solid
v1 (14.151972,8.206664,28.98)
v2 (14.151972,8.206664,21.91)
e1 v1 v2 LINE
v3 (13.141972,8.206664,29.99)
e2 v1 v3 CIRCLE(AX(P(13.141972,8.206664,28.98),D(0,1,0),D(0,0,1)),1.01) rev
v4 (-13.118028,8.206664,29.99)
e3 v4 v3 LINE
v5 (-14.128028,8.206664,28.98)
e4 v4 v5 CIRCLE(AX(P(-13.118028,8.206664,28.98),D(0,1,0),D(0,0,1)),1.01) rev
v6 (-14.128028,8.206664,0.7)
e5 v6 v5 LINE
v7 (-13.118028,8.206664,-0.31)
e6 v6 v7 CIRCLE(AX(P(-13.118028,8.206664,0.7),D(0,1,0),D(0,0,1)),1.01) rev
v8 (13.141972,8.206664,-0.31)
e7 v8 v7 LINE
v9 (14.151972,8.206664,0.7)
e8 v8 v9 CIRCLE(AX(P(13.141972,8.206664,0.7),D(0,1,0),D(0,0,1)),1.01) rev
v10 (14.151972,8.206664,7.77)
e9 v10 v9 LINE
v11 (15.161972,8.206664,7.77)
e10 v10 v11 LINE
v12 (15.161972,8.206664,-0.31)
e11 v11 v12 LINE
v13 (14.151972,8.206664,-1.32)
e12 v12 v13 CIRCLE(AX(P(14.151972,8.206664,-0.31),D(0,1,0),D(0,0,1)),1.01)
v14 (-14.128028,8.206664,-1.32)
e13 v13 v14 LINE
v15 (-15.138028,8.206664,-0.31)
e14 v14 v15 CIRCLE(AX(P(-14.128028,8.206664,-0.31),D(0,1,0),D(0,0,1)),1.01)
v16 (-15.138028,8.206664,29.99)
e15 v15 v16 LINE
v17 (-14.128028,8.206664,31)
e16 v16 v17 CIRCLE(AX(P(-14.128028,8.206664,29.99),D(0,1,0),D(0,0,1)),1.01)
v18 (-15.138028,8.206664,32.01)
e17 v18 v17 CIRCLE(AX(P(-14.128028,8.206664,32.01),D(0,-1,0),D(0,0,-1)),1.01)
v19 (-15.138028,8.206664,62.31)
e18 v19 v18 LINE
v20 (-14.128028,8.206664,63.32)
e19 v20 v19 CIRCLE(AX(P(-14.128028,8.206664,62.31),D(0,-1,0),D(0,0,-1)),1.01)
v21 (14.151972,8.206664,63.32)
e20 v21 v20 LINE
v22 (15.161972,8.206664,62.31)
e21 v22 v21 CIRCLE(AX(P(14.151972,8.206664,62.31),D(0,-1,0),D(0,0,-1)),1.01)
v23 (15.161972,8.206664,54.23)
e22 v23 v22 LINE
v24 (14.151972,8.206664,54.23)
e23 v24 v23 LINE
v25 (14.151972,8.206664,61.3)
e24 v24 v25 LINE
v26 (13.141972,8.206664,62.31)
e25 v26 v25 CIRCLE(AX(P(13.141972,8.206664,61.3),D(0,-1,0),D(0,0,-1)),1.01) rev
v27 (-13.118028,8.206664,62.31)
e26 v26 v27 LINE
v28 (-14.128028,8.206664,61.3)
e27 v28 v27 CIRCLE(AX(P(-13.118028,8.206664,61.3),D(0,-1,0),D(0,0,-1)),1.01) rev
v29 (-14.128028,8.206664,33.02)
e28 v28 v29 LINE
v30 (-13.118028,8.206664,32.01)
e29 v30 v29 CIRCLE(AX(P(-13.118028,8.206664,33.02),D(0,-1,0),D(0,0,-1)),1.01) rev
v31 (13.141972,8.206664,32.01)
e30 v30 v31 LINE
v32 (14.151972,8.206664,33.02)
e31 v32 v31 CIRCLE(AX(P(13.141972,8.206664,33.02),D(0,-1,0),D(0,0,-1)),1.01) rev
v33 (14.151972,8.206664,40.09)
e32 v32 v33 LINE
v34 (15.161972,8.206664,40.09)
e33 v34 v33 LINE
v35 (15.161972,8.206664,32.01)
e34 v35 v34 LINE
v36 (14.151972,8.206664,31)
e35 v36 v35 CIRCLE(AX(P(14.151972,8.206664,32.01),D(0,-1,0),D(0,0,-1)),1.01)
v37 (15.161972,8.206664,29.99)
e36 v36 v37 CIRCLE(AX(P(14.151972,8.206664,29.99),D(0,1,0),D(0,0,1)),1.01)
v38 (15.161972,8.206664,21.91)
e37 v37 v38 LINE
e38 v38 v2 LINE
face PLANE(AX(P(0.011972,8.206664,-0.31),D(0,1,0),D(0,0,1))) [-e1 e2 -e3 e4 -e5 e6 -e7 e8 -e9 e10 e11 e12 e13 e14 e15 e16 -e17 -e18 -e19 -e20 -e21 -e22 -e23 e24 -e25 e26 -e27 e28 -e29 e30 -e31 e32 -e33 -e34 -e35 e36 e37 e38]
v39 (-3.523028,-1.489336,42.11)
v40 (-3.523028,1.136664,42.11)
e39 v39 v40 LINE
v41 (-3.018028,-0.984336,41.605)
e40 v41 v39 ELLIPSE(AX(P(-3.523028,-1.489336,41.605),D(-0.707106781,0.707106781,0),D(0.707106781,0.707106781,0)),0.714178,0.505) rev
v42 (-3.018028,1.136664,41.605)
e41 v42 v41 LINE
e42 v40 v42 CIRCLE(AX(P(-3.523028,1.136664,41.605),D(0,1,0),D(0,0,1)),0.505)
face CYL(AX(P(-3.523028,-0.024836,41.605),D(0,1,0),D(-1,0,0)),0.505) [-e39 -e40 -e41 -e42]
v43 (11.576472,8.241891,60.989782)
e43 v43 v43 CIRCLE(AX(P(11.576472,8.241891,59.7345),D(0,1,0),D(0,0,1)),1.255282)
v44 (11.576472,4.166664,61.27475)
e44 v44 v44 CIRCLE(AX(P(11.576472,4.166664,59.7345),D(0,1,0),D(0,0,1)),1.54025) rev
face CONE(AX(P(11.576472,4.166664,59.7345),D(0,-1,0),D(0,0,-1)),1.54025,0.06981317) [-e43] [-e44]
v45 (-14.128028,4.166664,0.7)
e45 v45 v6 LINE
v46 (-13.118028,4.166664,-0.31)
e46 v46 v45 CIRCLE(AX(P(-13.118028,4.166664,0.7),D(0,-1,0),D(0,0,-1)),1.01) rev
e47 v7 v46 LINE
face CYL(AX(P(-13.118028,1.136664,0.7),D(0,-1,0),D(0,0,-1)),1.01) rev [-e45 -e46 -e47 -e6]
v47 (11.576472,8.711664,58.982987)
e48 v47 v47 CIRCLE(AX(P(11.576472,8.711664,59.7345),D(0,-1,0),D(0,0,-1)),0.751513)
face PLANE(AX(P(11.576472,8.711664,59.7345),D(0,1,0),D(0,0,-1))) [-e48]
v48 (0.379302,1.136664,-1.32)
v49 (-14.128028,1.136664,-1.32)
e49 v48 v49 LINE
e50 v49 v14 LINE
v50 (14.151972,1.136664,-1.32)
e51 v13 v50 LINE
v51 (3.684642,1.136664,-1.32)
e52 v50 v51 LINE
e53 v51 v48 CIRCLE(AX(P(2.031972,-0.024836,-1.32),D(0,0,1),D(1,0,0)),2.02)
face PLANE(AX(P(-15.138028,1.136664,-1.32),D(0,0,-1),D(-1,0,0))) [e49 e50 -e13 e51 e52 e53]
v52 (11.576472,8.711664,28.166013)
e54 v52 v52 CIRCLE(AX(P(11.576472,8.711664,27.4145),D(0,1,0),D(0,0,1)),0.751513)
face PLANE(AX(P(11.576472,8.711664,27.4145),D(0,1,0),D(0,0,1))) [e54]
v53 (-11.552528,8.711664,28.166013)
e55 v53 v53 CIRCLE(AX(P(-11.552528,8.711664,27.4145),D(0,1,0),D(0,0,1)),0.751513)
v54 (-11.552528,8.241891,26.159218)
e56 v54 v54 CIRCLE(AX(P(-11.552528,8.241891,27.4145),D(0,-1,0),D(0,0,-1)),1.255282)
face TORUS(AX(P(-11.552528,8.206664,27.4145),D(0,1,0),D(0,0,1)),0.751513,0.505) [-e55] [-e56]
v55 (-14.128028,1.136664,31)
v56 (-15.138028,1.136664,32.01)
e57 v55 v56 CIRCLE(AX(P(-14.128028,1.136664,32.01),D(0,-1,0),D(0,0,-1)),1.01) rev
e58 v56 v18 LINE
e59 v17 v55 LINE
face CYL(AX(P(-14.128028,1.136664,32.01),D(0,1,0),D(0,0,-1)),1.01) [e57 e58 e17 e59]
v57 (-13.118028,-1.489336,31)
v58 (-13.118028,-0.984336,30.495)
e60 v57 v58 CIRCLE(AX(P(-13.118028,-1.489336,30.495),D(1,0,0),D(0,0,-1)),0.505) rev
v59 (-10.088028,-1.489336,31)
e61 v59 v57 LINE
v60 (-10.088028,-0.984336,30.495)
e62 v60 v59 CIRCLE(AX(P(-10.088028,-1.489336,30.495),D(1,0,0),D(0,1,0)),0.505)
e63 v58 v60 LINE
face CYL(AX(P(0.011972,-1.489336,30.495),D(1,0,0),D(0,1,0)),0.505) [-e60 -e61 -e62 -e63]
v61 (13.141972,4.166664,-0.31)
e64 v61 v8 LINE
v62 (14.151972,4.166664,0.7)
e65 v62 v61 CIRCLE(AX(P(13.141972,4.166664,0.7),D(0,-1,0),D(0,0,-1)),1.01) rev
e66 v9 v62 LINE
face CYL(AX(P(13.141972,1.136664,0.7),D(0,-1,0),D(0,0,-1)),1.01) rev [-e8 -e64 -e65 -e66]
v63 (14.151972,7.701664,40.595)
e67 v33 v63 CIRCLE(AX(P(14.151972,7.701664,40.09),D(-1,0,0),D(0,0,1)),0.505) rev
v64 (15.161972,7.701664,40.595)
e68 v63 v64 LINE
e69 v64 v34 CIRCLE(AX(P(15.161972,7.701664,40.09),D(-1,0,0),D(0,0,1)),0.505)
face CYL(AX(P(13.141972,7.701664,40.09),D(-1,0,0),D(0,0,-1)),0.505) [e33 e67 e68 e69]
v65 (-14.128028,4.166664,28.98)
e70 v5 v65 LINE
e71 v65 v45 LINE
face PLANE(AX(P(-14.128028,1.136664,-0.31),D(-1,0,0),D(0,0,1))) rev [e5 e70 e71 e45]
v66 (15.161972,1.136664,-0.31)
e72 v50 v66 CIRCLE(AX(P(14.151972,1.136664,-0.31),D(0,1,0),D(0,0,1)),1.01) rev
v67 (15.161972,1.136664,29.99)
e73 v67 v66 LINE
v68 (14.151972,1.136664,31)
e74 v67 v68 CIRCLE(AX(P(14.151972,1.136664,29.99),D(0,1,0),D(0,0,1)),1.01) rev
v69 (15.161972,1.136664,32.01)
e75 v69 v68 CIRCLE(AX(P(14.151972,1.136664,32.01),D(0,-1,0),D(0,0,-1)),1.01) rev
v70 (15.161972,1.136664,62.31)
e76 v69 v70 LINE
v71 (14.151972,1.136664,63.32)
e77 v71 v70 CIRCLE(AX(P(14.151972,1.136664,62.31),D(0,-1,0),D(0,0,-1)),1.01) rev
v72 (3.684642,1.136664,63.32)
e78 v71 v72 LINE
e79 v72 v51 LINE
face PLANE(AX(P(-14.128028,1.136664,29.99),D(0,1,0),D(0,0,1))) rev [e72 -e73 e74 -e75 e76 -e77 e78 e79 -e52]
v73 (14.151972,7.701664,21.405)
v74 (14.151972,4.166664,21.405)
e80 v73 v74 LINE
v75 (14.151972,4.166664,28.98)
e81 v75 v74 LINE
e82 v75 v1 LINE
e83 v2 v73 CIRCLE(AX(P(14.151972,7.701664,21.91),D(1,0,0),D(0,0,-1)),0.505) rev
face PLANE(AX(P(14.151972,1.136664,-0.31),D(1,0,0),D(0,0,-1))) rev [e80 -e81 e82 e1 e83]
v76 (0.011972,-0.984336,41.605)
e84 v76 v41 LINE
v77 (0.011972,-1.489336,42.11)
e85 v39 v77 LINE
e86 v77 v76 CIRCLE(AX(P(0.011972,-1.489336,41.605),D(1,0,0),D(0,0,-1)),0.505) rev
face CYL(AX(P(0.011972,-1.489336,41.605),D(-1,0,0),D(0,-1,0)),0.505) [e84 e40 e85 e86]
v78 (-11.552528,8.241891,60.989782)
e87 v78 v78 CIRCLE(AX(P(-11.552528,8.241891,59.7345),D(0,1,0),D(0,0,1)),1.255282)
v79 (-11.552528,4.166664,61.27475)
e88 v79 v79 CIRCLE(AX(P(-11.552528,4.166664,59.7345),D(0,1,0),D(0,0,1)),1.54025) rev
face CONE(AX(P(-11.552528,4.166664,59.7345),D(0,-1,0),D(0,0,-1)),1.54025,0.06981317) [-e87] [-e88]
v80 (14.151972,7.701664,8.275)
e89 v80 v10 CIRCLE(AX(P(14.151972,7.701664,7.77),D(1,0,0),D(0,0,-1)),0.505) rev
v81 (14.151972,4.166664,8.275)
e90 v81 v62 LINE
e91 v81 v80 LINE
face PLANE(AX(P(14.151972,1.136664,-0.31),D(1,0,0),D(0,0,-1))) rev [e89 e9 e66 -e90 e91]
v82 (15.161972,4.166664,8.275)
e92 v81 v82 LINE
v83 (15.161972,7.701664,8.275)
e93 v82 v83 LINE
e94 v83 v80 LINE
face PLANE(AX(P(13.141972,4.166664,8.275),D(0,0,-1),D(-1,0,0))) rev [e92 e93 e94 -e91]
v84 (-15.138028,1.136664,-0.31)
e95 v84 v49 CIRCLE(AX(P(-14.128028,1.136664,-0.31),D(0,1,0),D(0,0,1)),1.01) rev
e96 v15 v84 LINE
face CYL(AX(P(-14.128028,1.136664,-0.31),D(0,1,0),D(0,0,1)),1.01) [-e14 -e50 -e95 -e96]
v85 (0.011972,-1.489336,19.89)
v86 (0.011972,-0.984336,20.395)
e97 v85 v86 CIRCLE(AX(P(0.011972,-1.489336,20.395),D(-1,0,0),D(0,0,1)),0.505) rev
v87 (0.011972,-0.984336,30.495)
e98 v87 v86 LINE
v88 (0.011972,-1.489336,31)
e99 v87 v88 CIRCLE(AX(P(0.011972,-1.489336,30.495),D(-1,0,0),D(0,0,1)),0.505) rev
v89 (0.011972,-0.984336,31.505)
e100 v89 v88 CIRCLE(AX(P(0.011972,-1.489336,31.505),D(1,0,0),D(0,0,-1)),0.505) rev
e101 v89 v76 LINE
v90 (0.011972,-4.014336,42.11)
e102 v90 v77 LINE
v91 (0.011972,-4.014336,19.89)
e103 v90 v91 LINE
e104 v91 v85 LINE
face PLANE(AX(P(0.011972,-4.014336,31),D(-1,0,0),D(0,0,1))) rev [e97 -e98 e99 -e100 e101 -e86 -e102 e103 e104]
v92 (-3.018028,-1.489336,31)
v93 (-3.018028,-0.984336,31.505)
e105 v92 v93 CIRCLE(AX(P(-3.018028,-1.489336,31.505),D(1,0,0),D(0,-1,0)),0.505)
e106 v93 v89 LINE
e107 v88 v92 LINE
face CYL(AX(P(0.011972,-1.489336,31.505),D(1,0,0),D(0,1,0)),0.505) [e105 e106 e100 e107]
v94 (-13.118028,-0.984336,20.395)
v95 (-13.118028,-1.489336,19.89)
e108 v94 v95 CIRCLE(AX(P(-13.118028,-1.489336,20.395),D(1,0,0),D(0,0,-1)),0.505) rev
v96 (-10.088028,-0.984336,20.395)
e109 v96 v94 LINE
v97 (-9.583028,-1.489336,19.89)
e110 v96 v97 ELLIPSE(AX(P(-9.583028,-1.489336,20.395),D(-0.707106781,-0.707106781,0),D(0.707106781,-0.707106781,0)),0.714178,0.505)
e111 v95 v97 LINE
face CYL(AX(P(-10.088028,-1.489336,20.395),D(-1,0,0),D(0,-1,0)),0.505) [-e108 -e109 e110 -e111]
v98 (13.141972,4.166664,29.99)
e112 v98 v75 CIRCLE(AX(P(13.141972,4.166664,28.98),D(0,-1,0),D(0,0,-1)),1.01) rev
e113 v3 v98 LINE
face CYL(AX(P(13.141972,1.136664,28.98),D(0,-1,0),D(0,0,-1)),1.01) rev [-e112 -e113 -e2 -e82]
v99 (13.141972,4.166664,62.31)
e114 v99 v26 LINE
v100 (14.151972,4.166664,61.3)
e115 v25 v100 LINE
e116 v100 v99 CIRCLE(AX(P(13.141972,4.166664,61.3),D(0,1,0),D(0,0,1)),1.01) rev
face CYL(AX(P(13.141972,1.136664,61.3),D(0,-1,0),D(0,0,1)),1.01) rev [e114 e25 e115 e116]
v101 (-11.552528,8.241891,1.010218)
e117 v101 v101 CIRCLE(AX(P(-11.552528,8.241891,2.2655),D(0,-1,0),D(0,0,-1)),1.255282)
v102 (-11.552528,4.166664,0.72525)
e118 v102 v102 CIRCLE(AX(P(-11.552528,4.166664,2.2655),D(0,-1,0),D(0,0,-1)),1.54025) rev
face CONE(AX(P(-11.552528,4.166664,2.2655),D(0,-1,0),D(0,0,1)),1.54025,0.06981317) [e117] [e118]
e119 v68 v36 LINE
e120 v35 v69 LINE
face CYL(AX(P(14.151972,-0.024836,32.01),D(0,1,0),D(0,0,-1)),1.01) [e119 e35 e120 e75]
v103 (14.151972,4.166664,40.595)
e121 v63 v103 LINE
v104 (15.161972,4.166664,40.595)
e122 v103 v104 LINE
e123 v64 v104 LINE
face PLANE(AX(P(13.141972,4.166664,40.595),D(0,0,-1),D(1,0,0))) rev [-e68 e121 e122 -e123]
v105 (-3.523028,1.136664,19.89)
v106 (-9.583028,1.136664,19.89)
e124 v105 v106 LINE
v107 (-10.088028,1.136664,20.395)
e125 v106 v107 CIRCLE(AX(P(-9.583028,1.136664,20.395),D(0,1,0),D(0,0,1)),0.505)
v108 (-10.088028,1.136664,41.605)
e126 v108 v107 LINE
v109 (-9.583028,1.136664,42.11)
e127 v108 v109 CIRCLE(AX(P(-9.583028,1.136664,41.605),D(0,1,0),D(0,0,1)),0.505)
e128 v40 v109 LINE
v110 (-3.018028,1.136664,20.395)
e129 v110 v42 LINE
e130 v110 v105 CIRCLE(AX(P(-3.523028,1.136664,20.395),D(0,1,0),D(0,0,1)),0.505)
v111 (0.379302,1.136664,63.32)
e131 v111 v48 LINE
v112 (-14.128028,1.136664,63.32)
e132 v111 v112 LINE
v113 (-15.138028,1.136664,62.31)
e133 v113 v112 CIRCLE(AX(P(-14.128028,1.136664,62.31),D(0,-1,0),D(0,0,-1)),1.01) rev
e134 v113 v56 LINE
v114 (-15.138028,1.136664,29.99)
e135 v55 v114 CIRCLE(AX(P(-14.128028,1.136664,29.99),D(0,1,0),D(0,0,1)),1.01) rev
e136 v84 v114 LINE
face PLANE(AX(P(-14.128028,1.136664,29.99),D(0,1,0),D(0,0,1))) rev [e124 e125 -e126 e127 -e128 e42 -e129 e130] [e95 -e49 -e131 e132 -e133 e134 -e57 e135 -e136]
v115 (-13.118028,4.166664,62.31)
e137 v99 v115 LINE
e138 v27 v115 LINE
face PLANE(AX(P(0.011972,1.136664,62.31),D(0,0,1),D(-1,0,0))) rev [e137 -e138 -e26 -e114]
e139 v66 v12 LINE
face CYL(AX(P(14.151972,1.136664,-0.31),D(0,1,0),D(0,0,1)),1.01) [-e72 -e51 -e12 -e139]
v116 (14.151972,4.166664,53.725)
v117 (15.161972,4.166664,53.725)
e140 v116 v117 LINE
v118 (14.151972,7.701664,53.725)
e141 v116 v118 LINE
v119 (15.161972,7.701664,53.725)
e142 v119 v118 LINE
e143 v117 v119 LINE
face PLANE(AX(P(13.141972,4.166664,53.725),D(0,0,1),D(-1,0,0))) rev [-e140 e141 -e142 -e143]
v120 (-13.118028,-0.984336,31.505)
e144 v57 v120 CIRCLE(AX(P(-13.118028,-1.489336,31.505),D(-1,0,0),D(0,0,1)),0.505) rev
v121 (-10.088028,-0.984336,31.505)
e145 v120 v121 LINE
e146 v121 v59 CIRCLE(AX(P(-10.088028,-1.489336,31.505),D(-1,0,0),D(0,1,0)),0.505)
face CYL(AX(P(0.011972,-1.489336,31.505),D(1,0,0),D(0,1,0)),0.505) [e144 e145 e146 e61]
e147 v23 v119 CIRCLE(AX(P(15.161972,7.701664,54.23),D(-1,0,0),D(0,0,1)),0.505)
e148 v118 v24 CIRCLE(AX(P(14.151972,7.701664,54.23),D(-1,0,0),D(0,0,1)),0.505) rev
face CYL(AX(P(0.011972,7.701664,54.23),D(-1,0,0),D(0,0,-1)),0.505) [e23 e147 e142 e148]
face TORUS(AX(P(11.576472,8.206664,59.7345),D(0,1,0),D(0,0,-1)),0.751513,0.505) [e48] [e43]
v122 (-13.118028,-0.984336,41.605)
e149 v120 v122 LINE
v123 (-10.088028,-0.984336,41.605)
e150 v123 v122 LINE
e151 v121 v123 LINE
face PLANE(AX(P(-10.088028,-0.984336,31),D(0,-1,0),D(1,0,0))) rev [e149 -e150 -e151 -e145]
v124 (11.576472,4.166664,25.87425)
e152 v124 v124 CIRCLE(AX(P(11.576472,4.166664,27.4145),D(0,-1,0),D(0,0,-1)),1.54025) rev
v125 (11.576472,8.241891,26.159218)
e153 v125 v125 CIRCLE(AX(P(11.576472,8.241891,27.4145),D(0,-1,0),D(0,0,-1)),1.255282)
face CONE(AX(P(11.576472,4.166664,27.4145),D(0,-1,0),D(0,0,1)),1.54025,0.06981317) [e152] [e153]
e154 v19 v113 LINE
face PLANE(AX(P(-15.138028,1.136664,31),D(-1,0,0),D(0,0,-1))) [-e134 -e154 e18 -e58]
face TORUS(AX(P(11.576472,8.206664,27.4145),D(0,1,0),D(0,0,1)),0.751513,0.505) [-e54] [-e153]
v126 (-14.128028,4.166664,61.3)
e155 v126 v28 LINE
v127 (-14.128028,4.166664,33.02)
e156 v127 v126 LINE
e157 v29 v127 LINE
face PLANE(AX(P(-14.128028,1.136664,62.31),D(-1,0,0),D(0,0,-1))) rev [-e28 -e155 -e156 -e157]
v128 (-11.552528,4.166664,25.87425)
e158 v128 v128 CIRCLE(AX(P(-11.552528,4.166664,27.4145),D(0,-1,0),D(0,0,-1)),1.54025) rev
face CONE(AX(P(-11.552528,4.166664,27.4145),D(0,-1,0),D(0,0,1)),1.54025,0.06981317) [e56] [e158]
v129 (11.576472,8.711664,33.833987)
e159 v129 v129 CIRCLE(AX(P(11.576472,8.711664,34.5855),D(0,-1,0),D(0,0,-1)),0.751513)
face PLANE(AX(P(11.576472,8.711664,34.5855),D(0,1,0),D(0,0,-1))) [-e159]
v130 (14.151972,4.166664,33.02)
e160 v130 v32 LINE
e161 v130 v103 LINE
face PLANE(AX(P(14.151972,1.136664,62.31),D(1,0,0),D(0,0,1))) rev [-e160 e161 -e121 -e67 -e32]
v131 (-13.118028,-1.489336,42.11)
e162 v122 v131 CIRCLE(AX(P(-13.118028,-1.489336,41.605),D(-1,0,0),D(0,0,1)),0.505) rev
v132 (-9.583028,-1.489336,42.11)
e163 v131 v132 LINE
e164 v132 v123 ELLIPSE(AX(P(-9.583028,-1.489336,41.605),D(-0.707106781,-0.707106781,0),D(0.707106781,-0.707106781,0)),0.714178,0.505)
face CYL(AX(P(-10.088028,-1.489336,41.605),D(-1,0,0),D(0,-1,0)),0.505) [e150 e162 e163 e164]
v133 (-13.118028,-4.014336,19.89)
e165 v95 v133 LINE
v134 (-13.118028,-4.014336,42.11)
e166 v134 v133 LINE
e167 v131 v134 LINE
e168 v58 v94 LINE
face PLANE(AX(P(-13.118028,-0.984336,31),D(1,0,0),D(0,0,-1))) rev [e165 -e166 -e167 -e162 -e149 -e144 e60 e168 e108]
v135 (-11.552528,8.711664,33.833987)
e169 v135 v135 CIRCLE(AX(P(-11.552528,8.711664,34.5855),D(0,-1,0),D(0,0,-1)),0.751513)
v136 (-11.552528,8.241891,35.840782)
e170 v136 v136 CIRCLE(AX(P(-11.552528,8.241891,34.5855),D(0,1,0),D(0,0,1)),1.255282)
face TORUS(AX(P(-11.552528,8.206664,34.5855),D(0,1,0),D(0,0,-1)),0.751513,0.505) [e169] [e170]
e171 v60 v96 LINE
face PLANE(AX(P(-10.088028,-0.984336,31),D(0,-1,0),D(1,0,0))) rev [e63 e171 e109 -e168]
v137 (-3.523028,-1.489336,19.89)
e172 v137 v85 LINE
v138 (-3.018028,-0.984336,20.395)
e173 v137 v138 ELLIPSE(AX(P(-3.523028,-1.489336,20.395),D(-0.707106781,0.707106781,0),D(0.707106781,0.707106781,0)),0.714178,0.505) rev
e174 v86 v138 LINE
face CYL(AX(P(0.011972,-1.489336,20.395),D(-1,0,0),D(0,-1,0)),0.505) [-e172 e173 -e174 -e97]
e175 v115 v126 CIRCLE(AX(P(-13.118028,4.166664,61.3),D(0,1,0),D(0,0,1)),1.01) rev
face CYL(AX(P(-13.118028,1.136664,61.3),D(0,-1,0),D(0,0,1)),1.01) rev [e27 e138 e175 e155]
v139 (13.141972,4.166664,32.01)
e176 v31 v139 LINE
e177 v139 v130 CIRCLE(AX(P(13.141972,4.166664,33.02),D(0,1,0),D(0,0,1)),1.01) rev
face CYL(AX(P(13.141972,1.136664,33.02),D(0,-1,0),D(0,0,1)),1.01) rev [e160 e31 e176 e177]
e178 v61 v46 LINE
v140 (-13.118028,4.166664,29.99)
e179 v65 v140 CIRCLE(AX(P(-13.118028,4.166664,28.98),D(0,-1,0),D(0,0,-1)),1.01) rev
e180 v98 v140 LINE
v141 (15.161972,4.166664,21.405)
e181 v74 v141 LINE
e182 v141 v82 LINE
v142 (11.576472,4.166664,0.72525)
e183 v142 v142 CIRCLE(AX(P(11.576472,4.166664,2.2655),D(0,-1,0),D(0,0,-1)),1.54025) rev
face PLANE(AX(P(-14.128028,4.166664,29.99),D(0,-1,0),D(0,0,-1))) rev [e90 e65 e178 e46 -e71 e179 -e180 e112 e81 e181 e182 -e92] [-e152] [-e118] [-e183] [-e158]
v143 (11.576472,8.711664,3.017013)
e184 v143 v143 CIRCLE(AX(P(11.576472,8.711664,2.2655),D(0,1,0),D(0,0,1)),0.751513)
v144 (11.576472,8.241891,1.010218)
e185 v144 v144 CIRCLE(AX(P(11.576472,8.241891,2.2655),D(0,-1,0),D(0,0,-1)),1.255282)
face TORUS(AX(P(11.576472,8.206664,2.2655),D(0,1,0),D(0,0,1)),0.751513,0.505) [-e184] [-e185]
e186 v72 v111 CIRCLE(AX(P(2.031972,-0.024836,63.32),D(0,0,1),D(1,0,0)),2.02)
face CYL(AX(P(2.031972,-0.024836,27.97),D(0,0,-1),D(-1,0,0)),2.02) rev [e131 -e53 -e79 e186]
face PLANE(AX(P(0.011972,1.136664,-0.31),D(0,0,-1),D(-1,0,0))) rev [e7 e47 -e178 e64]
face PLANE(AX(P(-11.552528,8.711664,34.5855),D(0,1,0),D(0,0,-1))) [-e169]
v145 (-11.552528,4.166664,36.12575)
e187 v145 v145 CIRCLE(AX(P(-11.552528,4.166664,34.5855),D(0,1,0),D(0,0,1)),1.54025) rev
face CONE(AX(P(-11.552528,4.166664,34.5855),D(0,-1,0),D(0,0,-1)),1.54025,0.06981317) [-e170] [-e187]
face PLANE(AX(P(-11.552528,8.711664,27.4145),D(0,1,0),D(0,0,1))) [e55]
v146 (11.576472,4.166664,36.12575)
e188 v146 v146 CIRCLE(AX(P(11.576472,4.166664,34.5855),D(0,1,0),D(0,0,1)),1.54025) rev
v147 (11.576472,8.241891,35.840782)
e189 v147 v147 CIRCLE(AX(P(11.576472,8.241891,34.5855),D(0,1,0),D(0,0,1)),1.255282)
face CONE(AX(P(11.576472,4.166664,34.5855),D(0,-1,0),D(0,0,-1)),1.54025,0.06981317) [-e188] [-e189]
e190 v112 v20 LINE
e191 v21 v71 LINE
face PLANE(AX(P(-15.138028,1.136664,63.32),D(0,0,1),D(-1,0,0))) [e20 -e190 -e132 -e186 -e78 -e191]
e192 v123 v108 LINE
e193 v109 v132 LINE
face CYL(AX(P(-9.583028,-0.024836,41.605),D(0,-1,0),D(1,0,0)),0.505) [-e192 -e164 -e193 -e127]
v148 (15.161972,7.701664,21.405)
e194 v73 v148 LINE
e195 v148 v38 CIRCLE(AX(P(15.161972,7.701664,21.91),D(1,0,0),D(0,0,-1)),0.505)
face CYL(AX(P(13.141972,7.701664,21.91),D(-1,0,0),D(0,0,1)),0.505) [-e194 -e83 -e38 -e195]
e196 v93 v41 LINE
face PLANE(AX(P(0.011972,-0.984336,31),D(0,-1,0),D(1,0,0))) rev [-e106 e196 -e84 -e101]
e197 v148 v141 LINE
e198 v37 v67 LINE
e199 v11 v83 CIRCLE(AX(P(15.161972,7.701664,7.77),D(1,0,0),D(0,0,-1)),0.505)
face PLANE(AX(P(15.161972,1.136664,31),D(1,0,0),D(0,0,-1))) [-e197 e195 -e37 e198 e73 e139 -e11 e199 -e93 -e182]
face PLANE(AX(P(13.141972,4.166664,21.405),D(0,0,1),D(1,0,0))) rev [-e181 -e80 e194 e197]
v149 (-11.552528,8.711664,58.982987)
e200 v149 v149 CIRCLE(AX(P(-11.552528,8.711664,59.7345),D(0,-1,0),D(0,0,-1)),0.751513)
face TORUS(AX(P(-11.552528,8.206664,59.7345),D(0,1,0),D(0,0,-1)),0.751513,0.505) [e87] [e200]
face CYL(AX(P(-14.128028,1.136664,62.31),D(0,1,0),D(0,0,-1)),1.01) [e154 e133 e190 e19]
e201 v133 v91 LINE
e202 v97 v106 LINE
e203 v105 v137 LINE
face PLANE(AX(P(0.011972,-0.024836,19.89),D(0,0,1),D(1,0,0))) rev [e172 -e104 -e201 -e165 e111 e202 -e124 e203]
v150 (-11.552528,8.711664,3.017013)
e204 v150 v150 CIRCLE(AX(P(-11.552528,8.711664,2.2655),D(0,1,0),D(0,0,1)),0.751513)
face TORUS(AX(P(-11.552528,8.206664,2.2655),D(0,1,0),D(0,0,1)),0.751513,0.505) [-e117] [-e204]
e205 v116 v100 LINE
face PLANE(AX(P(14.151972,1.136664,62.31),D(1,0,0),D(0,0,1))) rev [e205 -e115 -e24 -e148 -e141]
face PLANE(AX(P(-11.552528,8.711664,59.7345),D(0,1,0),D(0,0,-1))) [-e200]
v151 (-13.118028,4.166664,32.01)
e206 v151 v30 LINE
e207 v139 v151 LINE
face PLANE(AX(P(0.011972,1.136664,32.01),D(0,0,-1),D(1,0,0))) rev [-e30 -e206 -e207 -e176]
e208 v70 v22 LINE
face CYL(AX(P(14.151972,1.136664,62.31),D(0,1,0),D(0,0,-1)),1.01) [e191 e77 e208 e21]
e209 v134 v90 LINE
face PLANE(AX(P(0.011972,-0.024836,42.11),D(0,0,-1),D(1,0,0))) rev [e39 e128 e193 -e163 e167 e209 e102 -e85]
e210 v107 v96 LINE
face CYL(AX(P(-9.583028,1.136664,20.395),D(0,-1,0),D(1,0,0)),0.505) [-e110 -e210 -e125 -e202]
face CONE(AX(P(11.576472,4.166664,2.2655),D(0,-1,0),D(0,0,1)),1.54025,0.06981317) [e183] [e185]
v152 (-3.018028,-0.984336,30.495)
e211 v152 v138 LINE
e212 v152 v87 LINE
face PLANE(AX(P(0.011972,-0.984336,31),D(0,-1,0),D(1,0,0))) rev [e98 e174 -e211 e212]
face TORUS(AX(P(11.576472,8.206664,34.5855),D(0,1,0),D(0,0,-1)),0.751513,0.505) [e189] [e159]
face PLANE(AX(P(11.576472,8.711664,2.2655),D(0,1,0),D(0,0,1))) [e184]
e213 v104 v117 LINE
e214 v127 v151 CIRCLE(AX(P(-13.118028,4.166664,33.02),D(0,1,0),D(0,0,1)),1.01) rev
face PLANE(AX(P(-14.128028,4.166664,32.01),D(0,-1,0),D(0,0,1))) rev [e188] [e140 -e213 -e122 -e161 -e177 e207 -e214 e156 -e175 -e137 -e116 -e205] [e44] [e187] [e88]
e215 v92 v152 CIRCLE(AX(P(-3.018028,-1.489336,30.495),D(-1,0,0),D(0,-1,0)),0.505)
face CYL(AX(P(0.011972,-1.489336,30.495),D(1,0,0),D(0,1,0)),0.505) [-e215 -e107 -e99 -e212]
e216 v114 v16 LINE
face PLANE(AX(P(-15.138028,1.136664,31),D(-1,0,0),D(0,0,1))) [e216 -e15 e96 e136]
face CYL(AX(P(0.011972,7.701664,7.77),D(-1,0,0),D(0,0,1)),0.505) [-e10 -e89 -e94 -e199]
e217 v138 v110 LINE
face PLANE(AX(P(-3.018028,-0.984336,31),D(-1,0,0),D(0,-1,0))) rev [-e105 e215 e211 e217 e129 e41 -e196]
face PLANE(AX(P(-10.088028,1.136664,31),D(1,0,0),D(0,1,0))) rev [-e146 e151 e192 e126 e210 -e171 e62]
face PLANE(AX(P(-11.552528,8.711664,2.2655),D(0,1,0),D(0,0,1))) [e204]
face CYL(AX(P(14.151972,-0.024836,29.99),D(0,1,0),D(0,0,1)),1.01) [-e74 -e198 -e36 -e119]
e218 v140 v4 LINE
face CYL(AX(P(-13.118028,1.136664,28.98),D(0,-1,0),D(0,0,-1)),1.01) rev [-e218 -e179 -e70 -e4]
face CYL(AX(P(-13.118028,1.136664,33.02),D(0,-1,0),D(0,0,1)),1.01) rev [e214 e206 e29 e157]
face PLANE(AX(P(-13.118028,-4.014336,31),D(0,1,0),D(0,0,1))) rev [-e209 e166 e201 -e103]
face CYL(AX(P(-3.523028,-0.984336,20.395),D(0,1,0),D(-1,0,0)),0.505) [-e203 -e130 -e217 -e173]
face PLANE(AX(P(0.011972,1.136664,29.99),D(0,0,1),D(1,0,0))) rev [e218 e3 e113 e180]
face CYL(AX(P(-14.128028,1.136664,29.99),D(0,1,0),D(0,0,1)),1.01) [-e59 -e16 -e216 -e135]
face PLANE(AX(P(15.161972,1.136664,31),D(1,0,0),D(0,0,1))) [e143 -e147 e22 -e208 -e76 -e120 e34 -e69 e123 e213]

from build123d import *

# Parameters (mm, degrees)
BOSS_EXTRUDE1_DEPTH           = 28
SKETCH4_W                     = 28
SKETCH4_H                     = 3
BOSS_EXTRUDE2_DEPTH           = 30
INTERSECT1_DEPTH              = 28
BOSS_EXTRUDE3_DEPTH           = 1
BOSS_EXTRUDE3_DEPTH_BACK      = 10
EXTRUDE_THIN1_DEPTH           = 4
EXTRUDE_THIN1_DEPTH_BACK      = 3
SKETCH8_W                     = 30
SKETCH8_H                     = 32
SKETCH8_W_2                   = 28
SKETCH8_H_2                   = 30
FILLET1_R                     = 1
FILLET2_R                     = 0.5
SKETCH9_R                     = 1.525
BOSS_EXTRUDE4_DEPTH           = 4.5
BOSS_EXTRUDE4_DRAFT           = 4
BOSS_EXTRUDE4_PROFILE_2_DEPTH = 4.5
BOSS_EXTRUDE4_PROFILE_2_DRAFT = 4
BOSS_EXTRUDE4_PROFILE_3_DEPTH = 4.5
BOSS_EXTRUDE4_PROFILE_3_DRAFT = 4
BOSS_EXTRUDE4_PROFILE_4_DEPTH = 4.5
BOSS_EXTRUDE4_PROFILE_4_DRAFT = 4
CUT_EXTRUDE2_DEPTH            = 36.508062465
CUT_EXTRUDE2_DEPTH_BACK       = 36.508062465
SKETCH2_R                     = 2
SKETCH10_W                    = 13
SKETCH10_H                    = 4
CUT_EXTRUDE3_DEPTH            = 2
FILLET3_R                     = 0.5
FILLET4_R                     = 0.5
SCALE1_SCALE                  = 1.01


# Read off the part's stored shape, not the designer's step: Intersect1
with BuildPart() as part:
    # Sketch3 → Boss-Extrude1 (new body)
    with BuildSketch(Plane.XY):
        with BuildLine():
            Line((3.638185472, -1.147322256), (14, -0.95))
            Line((14, -0.95), (14, 1.15))
            Line((14, 1.15), (3.636306817, 1.15))
            ThreePointArc((3.636306817, 1.15), (2, 2), (0.363693183, 1.15))
            Line((0.363693183, 1.15), (-14, 1.15))
            Line((-14, 1.15), (-14, -0.95))
            Line((-14, -0.95), (0.240028409, -0.95))
            ThreePointArc((0.240028409, -0.95), (1.884060434, -1.996636676), (3.638185472, -1.147322256))
        make_face()
    extrude(amount=BOSS_EXTRUDE1_DEPTH)


with BuildPart() as body_2:
    # Sketch4 → Boss-Extrude2 (new body)
    with BuildSketch(Plane.XY):
        with Locations((0, 2.65)):
            Rectangle(SKETCH4_W, SKETCH4_H)
    extrude(amount=BOSS_EXTRUDE2_DEPTH)


with BuildPart() as intersect1_tool:
    # Intersect1 outline → Intersect1 (new body)
    with BuildSketch(Plane.XY):
        with BuildLine():
            Line((14, -0.95), (14, 1.15))
            Line((14, 1.15), (3.636306817, 1.15))
            ThreePointArc((3.636306817, 1.15), (2, 2), (0.363693183, 1.15))
            Line((0.363693183, 1.15), (-14, 1.15))
            Line((-14, 1.15), (-14, -0.95))
            Line((-14, -0.95), (0.240028409, -0.95))
            ThreePointArc((0.240028409, -0.95), (1.884060434, -1.996636676), (3.638185472, -1.147322256))
            Line((3.638185472, -1.147322256), (14, -0.95))
        make_face()
    extrude(amount=INTERSECT1_DEPTH)


with BuildPart() as part_1:
    add(part.part)

    # Intersect1: cut by intersect1_tool
    add(intersect1_tool.part, mode=Mode.SUBTRACT)


with BuildPart() as body_2_1:
    add(body_2.part)

    # Intersect1: cut by intersect1_tool
    add(intersect1_tool.part, mode=Mode.SUBTRACT)

    # Sketch6 → Boss-Extrude3 (add, two sides: drawn at the far end of the back side and taken through both)
    with BuildSketch(Plane.XY.offset(30).offset(-BOSS_EXTRUDE3_DEPTH_BACK)):
        Polygon((-10, 1.15), (-10, -0.95), (-13, -0.95), (-13, -3.95), (0, -3.95), (0, -0.95), (-3, -0.95), (-3, 1.15), align=None)
    extrude(amount=BOSS_EXTRUDE3_DEPTH + BOSS_EXTRUDE3_DEPTH_BACK)

    # Sketch8 → Extrude-Thin1 (add, two sides: drawn at the far end of the back side and taken through both)
    with BuildSketch(Plane(origin=(0, 4.15, 0), x_dir=(1, 0, 0), z_dir=(0, 1, 0)).offset(-EXTRUDE_THIN1_DEPTH_BACK)):
        with Locations((0, -15)):
            Rectangle(SKETCH8_W, SKETCH8_H)
        with Locations((0, -15)):
            Rectangle(SKETCH8_W_2, SKETCH8_H_2, mode=Mode.SUBTRACT)
    extrude(amount=EXTRUDE_THIN1_DEPTH + EXTRUDE_THIN1_DEPTH_BACK)

    # Fillet1
    fillet1_edges = [body_2_1.edges().sort_by_distance(p)[0] for p in [
        (14, 6.15, 0),
        (14, 6.15, 30),
        (-14, 6.15, 0),
        (-14, 6.15, 30),
        (15, 4.65, -1),
        (15, 4.65, 31),
        (-15, 4.65, 31),
        (-15, 4.65, -1),
    ]]
    fillet(fillet1_edges, radius=FILLET1_R)

    # Fillet2
    fillet2_edges = [body_2_1.edges().sort_by_distance(p)[0] for p in [
        (-11.5, -0.95, 20),
        (-1.5, -0.95, 20),
        (-11.5, -0.95, 31),
        (-1.5, -0.95, 31),
    ]]
    fillet(fillet2_edges, radius=FILLET2_R)


with BuildPart() as boss_extrude4_tool:
    # Sketch9 → Boss-Extrude4 (with draft: the straight prism first)
    with BuildSketch(Plane(origin=(0, 4.15, 0), x_dir=(1, 0, 0), z_dir=(0, 1, 0))):
        with Locations((11.45, -27.45)):
            Circle(SKETCH9_R)
    extrude(amount=BOSS_EXTRUDE4_DEPTH)
    # Boss-Extrude4: the draft: its side faces are tilted about the plane it starts from
    boss_extrude4_sides = [boss_extrude4_tool.faces().sort_by_distance(p)[0] for p in [
        (9.925, 6.4, 27.45),
    ]]
    draft(boss_extrude4_sides, Plane(origin=(0, 4.15, 0), x_dir=(1, 0, 0), z_dir=(0, 1, 0)), BOSS_EXTRUDE4_DRAFT)


with BuildPart() as body_2_2:
    add(body_2_1.part)

    # Boss-Extrude4: add boss_extrude4_tool
    add(boss_extrude4_tool.part)


with BuildPart() as boss_extrude4_profile_2_tool:
    # Sketch9 → Boss-Extrude4 profile 2 (with draft: the straight prism first)
    with BuildSketch(Plane(origin=(0, 4.15, 0), x_dir=(1, 0, 0), z_dir=(0, 1, 0))):
        with Locations((-11.45, -27.45)):
            Circle(SKETCH9_R)
    extrude(amount=BOSS_EXTRUDE4_PROFILE_2_DEPTH)
    # Boss-Extrude4 profile 2: the draft: its side faces are tilted about the plane it starts from
    boss_extrude4_profile_2_sides = [boss_extrude4_profile_2_tool.faces().sort_by_distance(p)[0] for p in [
        (-12.975, 6.4, 27.45),
    ]]
    draft(boss_extrude4_profile_2_sides, Plane(origin=(0, 4.15, 0), x_dir=(1, 0, 0), z_dir=(0, 1, 0)), BOSS_EXTRUDE4_PROFILE_2_DRAFT)


with BuildPart() as body_2_3:
    add(body_2_2.part)

    # Boss-Extrude4 profile 2: add boss_extrude4_profile_2_tool
    add(boss_extrude4_profile_2_tool.part)


with BuildPart() as boss_extrude4_profile_3_tool:
    # Sketch9 → Boss-Extrude4 profile 3 (with draft: the straight prism first)
    with BuildSketch(Plane(origin=(0, 4.15, 0), x_dir=(1, 0, 0), z_dir=(0, 1, 0))):
        with Locations((-11.45, -2.55)):
            Circle(SKETCH9_R)
    extrude(amount=BOSS_EXTRUDE4_PROFILE_3_DEPTH)
    # Boss-Extrude4 profile 3: the draft: its side faces are tilted about the plane it starts from
    boss_extrude4_profile_3_sides = [boss_extrude4_profile_3_tool.faces().sort_by_distance(p)[0] for p in [
        (-12.975, 6.4, 2.55),
    ]]
    draft(boss_extrude4_profile_3_sides, Plane(origin=(0, 4.15, 0), x_dir=(1, 0, 0), z_dir=(0, 1, 0)), BOSS_EXTRUDE4_PROFILE_3_DRAFT)


with BuildPart() as body_2_4:
    add(body_2_3.part)

    # Boss-Extrude4 profile 3: add boss_extrude4_profile_3_tool
    add(boss_extrude4_profile_3_tool.part)


with BuildPart() as boss_extrude4_profile_4_tool:
    # Sketch9 → Boss-Extrude4 profile 4 (with draft: the straight prism first)
    with BuildSketch(Plane(origin=(0, 4.15, 0), x_dir=(1, 0, 0), z_dir=(0, 1, 0))):
        with Locations((11.45, -2.55)):
            Circle(SKETCH9_R)
    extrude(amount=BOSS_EXTRUDE4_PROFILE_4_DEPTH)
    # Boss-Extrude4 profile 4: the draft: its side faces are tilted about the plane it starts from
    boss_extrude4_profile_4_sides = [boss_extrude4_profile_4_tool.faces().sort_by_distance(p)[0] for p in [
        (9.925, 6.4, 2.55),
    ]]
    draft(boss_extrude4_profile_4_sides, Plane(origin=(0, 4.15, 0), x_dir=(1, 0, 0), z_dir=(0, 1, 0)), BOSS_EXTRUDE4_PROFILE_4_DRAFT)


with BuildPart() as body_2_5:
    add(body_2_4.part)

    # Boss-Extrude4 profile 4: add boss_extrude4_profile_4_tool
    add(boss_extrude4_profile_4_tool.part)

    # Sketch2 → Cut-Extrude2 (cut, two sides: drawn at the far end of the back side and taken through both)
    with BuildSketch(Plane.XY.offset(-CUT_EXTRUDE2_DEPTH_BACK)):
        with Locations((2, 0)):
            Circle(SKETCH2_R)
    extrude(amount=CUT_EXTRUDE2_DEPTH + CUT_EXTRUDE2_DEPTH_BACK, mode=Mode.SUBTRACT)

    # Sketch10 → Cut-Extrude3 (cut)
    with BuildSketch(Plane(origin=(15, 0, 0), x_dir=(0, 0, -1), z_dir=(1, 0, 0))):
        with Locations((-15, 6.15)):
            Rectangle(SKETCH10_W, SKETCH10_H)
    extrude(amount=-CUT_EXTRUDE3_DEPTH, mode=Mode.SUBTRACT)

    # Fillet3
    fillet3_edges = [body_2_5.edges().sort_by_distance(p)[0] for p in [
        (10.239670654, 8.65, 27.45),
        (-12.660329346, 8.65, 27.45),
        (-12.660329346, 8.65, 2.55),
        (10.239670654, 8.65, 2.55),
        (14.5, 8.15, 21.5),
        (14.5, 8.15, 8.5),
    ]]
    fillet(fillet3_edges, radius=FILLET3_R)

    # Mirror5: body 2 across plane


with BuildPart() as body_2_6:
    add(body_2_5.part)
    add(body_2_5.part.mirror(Plane.XY.offset(31)))

    # Fillet4
    fillet4_edges = [body_2_6.edges().sort_by_distance(p)[0] for p in [
        (-10, -0.15, 20),
        (-3, -0.15, 20),
        (-3, -0.15, 42),
        (-10, -0.15, 42),
    ]]
    fillet(fillet4_edges, radius=FILLET4_R)


with BuildPart() as body_2_7:
    # Scale1: scaled about (-1.19720021, 2.483622693, 31)
    add(body_2_6.part.scale(SCALE1_SCALE).moved(Location((0.011972002, -0.024836227, -0.31))))


solid = body_2_7.part
